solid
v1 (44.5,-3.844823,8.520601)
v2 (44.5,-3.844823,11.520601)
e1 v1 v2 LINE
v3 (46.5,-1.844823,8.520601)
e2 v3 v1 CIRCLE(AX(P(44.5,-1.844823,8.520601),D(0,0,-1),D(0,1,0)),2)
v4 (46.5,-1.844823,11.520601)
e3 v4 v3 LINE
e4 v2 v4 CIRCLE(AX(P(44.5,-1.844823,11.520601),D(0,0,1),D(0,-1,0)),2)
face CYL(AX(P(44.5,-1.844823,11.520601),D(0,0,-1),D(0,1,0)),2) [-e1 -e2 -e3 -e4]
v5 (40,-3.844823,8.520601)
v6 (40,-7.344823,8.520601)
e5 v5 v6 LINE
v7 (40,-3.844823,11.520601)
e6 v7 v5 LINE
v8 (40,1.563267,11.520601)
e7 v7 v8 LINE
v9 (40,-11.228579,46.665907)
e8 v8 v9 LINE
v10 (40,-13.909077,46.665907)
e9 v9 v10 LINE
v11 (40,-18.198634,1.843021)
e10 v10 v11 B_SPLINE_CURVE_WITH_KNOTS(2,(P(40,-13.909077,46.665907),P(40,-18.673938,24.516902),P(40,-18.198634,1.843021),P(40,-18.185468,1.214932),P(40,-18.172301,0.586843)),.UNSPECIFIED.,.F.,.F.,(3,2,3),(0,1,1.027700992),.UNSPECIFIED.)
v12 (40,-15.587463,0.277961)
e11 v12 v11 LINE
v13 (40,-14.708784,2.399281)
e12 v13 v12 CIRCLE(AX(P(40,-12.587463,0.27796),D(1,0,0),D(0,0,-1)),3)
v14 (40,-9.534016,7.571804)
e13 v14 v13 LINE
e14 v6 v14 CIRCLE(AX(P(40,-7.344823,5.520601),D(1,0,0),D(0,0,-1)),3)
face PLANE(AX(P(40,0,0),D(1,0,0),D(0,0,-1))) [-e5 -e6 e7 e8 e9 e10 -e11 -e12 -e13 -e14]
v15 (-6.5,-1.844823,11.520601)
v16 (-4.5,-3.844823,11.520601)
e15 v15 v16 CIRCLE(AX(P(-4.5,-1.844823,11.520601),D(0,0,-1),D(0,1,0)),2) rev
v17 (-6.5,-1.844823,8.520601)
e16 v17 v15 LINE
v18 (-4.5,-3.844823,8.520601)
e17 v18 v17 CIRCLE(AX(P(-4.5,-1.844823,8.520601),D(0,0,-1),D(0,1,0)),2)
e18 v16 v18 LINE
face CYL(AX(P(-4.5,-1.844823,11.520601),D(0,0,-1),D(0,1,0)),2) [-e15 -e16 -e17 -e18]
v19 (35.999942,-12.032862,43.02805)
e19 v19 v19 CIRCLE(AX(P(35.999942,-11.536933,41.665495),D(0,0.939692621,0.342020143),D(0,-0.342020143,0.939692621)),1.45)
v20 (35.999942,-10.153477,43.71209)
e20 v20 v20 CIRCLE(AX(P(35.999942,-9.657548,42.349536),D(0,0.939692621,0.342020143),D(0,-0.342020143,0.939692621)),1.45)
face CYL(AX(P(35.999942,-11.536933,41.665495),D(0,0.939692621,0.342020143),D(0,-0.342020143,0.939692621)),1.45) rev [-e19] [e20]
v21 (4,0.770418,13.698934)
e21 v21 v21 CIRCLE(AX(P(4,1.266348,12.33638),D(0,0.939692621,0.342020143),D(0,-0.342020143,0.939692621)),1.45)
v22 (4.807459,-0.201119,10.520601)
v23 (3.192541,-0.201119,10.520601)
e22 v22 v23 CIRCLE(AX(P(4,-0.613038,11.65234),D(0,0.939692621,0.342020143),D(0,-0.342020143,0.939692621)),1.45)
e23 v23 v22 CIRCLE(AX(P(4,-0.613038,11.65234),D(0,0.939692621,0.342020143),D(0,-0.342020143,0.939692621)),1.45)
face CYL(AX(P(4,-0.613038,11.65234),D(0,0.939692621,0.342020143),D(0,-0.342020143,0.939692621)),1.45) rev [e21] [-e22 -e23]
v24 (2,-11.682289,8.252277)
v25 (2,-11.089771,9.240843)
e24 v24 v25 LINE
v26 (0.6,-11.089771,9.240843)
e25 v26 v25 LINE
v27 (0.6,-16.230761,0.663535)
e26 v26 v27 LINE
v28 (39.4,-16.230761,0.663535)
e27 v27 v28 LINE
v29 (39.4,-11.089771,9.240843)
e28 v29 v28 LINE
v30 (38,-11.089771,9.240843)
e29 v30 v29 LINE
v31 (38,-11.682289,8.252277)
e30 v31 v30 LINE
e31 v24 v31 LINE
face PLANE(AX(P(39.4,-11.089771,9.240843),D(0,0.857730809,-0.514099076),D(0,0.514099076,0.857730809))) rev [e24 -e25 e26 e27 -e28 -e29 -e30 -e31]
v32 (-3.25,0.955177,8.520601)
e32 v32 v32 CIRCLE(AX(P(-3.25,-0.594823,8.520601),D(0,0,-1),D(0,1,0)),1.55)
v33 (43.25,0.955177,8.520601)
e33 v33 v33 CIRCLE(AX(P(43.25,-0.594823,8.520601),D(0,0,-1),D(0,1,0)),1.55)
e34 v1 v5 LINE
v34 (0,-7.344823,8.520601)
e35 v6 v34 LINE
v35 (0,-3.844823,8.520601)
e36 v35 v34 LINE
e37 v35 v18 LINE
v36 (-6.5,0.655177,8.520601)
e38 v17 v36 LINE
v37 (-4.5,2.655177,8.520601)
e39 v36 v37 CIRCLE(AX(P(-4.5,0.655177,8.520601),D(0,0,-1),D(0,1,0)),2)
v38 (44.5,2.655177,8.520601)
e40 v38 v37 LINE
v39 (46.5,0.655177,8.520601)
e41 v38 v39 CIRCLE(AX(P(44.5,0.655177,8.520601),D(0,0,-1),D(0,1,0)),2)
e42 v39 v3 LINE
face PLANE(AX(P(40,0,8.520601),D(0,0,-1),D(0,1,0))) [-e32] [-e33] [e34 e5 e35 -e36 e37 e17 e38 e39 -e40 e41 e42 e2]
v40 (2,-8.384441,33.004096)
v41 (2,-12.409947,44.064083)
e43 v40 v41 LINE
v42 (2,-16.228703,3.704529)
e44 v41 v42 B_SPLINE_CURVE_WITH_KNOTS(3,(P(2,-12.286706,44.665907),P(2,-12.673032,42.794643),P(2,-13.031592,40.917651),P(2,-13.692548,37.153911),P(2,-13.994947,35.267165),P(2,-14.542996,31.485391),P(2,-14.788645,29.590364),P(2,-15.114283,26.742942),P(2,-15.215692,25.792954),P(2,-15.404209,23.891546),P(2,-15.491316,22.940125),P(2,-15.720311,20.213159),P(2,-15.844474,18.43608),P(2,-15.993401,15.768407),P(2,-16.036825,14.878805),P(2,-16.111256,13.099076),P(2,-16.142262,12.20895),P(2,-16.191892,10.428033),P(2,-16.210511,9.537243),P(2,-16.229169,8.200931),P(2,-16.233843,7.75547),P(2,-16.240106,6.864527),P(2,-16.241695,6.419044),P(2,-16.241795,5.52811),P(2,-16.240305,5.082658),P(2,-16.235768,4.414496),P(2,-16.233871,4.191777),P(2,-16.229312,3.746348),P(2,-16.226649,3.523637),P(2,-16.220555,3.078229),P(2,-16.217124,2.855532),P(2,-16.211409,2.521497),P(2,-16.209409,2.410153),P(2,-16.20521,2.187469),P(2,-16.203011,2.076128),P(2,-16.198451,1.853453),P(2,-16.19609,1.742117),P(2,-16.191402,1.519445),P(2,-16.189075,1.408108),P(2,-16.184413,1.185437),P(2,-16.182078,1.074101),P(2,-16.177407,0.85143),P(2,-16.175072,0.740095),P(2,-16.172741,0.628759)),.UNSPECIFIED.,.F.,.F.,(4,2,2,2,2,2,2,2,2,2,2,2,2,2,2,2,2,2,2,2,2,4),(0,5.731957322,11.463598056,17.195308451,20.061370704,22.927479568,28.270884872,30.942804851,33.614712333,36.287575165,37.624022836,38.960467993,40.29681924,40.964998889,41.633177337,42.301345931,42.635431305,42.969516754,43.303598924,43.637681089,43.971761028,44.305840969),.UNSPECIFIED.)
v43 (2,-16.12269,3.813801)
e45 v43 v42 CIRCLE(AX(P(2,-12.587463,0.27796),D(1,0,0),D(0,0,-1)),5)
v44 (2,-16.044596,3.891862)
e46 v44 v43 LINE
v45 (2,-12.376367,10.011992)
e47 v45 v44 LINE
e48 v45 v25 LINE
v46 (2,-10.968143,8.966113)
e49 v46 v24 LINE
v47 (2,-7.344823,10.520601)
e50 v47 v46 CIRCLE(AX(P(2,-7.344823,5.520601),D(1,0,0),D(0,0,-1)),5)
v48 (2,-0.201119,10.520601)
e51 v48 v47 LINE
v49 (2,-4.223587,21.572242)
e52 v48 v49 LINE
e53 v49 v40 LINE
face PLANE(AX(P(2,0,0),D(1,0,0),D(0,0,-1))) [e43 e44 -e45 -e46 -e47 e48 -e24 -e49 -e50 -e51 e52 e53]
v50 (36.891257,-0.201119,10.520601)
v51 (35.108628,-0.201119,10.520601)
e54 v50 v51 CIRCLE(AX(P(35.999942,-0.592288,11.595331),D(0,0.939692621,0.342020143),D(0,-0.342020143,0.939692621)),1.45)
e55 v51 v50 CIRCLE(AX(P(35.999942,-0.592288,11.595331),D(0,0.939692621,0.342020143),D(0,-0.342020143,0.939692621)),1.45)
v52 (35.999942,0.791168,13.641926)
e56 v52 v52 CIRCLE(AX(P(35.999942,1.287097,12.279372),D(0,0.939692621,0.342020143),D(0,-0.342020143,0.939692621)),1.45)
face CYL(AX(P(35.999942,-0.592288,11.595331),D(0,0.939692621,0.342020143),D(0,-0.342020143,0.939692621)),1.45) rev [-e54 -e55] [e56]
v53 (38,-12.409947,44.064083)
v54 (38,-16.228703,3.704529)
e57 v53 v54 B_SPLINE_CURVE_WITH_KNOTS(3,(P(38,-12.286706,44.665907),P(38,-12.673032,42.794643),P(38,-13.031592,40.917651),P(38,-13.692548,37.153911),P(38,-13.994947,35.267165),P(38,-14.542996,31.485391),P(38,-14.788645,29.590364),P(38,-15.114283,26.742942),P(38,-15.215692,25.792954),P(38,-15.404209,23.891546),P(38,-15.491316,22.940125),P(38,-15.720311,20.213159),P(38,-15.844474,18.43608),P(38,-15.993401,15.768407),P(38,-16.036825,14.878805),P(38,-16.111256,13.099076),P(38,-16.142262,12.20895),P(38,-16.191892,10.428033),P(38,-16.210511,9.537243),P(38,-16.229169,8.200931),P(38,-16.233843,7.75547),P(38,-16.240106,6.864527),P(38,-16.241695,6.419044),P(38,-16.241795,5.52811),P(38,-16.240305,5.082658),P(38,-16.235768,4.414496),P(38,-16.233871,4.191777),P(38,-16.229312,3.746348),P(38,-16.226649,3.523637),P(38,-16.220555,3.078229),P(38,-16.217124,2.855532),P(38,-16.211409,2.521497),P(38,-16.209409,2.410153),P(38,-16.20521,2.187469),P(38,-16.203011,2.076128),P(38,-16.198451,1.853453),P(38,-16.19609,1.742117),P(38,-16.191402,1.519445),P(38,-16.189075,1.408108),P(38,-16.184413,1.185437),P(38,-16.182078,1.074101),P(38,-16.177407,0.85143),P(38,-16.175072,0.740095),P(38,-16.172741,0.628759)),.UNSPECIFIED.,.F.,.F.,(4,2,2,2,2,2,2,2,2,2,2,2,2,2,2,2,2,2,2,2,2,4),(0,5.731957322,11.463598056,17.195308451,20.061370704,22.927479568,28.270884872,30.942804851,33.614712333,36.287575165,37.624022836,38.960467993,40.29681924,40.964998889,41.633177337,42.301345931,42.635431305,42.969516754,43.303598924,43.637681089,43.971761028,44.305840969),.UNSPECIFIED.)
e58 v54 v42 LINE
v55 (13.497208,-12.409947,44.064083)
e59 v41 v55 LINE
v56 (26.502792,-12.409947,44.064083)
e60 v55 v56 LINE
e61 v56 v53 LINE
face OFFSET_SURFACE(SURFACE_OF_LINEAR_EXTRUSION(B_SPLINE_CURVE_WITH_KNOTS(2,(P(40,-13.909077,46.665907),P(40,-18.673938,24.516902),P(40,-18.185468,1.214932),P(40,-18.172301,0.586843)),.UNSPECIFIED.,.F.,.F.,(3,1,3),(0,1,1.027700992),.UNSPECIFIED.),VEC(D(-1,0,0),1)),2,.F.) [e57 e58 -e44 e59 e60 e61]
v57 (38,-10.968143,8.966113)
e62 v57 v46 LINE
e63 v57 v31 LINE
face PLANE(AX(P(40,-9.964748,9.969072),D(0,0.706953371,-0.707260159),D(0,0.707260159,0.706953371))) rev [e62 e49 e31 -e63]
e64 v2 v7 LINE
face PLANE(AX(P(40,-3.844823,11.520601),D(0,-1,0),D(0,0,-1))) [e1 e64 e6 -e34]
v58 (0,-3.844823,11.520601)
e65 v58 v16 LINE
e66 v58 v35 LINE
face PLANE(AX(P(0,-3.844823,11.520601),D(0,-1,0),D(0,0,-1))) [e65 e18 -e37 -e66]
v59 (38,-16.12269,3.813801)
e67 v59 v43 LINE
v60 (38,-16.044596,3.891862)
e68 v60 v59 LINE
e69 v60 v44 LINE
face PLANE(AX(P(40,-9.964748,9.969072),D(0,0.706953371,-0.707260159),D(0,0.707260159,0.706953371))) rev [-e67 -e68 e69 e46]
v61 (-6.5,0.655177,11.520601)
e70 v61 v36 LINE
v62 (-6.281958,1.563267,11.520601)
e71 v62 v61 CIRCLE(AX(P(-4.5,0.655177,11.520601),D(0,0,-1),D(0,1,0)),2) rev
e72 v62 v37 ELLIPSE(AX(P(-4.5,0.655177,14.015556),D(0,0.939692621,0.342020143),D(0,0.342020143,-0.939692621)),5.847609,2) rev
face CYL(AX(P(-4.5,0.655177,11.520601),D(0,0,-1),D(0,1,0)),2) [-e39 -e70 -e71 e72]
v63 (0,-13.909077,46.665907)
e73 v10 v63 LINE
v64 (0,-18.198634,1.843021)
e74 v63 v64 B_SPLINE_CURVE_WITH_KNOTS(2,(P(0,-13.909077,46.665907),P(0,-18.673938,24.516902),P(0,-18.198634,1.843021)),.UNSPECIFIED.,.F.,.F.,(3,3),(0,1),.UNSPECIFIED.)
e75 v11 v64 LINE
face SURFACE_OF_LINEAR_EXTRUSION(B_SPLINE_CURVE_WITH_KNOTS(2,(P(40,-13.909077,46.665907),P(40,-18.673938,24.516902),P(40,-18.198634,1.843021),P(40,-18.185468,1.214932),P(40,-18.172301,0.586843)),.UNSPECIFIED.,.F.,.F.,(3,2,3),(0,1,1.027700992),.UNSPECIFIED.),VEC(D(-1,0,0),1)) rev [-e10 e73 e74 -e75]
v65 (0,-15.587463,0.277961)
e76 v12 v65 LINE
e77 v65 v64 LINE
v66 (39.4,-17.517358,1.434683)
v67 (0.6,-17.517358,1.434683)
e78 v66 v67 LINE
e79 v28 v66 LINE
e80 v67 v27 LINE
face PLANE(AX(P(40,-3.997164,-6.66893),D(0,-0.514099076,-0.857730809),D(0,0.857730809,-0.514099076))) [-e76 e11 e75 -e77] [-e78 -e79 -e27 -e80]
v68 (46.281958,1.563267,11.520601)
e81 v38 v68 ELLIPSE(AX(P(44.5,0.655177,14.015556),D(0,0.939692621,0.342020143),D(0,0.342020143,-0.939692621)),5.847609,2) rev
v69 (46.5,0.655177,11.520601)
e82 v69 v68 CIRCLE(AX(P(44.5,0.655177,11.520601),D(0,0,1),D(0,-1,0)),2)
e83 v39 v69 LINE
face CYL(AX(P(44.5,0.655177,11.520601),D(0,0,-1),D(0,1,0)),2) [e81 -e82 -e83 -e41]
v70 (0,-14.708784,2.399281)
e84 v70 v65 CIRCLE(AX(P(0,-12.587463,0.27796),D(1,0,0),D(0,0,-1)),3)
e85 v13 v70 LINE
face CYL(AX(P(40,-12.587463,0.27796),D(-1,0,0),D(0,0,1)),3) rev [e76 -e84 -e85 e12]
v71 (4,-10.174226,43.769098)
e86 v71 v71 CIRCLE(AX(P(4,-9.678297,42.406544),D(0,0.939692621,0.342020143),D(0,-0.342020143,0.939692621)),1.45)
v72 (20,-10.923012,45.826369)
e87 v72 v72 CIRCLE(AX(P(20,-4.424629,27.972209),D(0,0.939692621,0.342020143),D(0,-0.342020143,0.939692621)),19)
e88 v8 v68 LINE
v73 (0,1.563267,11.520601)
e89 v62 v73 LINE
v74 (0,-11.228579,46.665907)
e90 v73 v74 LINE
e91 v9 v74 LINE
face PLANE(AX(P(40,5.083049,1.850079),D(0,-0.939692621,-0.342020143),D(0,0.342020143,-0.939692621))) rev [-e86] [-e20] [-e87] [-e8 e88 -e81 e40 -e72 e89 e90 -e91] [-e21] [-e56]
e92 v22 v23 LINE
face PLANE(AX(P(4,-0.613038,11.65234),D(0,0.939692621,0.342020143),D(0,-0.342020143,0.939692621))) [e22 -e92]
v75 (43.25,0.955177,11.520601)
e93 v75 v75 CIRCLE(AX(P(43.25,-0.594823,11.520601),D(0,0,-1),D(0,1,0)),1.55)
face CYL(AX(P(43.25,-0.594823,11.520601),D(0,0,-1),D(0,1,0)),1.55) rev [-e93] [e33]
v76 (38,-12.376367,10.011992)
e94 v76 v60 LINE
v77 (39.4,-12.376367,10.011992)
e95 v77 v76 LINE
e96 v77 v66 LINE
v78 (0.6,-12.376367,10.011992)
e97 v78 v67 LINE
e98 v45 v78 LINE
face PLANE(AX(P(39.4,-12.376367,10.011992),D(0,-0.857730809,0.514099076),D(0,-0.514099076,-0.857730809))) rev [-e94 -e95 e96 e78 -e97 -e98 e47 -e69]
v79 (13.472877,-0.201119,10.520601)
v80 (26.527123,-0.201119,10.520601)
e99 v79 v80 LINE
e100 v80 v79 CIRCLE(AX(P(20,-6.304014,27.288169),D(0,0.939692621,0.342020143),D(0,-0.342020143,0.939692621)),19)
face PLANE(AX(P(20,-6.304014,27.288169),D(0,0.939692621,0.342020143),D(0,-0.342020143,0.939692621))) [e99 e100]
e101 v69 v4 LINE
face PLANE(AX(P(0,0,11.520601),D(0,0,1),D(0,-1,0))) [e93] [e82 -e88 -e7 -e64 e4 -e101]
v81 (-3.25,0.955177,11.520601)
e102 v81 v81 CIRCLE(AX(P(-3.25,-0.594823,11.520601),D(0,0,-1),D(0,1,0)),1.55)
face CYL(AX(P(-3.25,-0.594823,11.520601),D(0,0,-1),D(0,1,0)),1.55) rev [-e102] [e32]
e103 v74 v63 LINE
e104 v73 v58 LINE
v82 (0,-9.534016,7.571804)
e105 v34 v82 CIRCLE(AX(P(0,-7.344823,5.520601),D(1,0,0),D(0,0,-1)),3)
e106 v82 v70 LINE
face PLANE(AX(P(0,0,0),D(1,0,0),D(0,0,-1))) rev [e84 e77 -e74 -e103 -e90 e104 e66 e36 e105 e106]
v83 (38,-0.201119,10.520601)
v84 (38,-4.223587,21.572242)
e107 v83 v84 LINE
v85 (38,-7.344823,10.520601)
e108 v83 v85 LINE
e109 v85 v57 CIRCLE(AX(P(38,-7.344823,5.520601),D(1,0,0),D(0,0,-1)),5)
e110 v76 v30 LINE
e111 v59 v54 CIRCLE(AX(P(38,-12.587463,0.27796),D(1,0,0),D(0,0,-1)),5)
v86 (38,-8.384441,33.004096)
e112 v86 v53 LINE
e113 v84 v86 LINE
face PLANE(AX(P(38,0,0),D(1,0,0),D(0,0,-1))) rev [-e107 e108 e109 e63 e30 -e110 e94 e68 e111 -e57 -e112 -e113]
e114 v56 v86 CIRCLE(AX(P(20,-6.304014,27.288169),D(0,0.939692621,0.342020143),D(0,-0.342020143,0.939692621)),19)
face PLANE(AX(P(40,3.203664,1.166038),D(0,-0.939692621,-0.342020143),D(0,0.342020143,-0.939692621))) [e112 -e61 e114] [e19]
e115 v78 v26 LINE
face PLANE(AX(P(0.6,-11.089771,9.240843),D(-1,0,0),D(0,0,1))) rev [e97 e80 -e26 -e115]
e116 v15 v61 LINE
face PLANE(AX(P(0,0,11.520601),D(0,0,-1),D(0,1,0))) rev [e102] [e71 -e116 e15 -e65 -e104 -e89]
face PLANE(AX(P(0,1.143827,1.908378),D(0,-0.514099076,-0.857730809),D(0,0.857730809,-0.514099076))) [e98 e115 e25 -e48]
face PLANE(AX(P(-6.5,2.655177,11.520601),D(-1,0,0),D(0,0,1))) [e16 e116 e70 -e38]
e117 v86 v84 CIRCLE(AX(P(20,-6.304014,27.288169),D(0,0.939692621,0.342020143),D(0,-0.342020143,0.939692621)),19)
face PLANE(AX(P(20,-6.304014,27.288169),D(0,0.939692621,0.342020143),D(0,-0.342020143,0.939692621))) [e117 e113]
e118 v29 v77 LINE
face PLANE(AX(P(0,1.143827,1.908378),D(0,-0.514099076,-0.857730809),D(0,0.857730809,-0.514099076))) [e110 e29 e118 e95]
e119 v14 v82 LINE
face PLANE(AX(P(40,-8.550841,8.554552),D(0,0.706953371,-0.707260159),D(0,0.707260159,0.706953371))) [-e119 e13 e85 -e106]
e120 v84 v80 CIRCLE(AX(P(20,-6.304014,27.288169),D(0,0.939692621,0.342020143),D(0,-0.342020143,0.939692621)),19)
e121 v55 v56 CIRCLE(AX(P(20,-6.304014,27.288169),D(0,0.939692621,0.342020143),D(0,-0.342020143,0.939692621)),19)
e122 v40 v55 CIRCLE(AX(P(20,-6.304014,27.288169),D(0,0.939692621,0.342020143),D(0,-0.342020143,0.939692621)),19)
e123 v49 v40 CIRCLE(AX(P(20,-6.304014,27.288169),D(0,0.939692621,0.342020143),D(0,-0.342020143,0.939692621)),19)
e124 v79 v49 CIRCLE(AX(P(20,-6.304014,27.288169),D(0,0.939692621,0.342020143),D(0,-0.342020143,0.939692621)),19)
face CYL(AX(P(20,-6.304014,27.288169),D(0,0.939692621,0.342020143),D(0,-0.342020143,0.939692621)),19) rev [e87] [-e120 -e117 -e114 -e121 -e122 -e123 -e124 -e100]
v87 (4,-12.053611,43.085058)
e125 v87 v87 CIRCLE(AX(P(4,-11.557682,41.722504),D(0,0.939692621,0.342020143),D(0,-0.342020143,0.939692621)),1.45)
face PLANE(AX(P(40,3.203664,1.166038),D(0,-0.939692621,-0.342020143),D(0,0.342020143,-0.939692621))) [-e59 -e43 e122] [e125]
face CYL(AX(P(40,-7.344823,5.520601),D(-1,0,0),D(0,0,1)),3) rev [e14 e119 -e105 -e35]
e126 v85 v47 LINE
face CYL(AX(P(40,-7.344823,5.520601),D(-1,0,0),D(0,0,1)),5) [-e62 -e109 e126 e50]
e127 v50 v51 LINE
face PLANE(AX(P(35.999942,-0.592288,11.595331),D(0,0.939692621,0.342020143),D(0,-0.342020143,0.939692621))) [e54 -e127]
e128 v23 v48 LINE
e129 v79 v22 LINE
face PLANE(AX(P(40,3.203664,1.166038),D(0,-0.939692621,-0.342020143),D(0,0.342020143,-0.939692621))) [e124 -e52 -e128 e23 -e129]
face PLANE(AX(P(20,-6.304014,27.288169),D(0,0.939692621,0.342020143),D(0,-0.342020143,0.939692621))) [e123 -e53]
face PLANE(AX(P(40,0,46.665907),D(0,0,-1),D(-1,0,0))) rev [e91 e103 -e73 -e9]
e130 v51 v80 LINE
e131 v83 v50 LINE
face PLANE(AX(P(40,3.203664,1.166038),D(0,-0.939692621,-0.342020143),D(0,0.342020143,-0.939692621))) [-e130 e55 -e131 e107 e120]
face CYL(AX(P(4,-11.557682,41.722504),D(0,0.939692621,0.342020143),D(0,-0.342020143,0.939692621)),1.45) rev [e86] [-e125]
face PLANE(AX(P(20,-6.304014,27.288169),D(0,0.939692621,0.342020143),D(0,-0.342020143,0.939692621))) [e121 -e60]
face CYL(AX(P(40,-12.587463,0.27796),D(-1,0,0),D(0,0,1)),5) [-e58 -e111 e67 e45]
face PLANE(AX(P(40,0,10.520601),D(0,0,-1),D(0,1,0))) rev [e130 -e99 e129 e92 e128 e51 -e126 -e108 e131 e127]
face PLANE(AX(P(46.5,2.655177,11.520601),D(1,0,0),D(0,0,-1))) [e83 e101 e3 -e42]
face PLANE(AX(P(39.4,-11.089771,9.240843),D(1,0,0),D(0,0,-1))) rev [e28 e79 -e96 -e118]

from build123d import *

# Parameters (mm, degrees)
Y_KSEKLIK_EKSTR_ZYON1_DEPTH = 40
BO_ALTMA1_START             = 2
BO_ALTMA1_DEPTH             = 36
IZIM4_W                     = 38.8
IZIM4_H                     = 1.5
KES_EKSTR_ZYON1_DEPTH       = 10
IZIM5_R                     = 1.45
IZIM5_R_2                   = 19
KES_EKSTR_ZYON2_DEPTH       = 2
IZIM6_W                     = 6.5
IZIM6_H                     = 6.5
IZIM6_R                     = 1.55
Y_KSEKLIK_EKSTR_ZYON2_DEPTH = 3
RADYUS1_R                   = 2
KES_EKSTR_ZYON3_DEPTH       = 10
KES_EKSTR_ZYON3_DEPTH_BACK  = 55


# Read off the part's stored shape, not the designer's step: İç Boşaltma1
with BuildPart() as part:
    # Çizim2 → Yükseklik-Ekstrüzyon1 (new body)
    with BuildSketch(Plane(origin=(0, 0, 0), x_dir=(0, 0, -1), z_dir=(1, 0, 0))):
        with BuildLine():
            Line((-8.520601237, 2.655177464), (-8.520601237, -7.344822536))
            ThreePointArc((-8.520601237, -7.344822536), (-8.2732007, -8.537800405), (-7.571803773, -9.53401603))
            Line((-7.571803773, -9.53401603), (-2.399280893, -14.708783566))
            ThreePointArc((-2.399280893, -14.708783566), (-1.426311448, -15.35897725), (-0.27796055, -15.587463223))
            Line((-0.27796055, -15.587463223), (-1.843021011, -18.19863418))
            add(Edge.make_bspline(
                [(-46.665907249, -13.909076506), (-24.516902354, -18.673937552), (-1.843021011, -18.19863418)],
                knots=[0, 0, 0, 1, 1, 1], degree=2))
            Line((-46.665907249, -13.909076506), (-46.665907249, -11.228578501))
            Line((-46.665907249, -11.228578501), (-8.520601237, 2.655177464))
        make_face()
    extrude(amount=Y_KSEKLIK_EKSTR_ZYON1_DEPTH)

    # İç Boşaltma1 outline → İç Boşaltma1 (cut)
    with BuildSketch(Plane.YZ.offset(BO_ALTMA1_START)):
        with BuildLine():
            Line((-0.201118549, 10.520601237), (-12.409947295, 44.064082645))
            add(Edge.make_bspline(
                [(-12.409947295, 44.064082645), (-12.786167702, 42.211926114), (-13.142061282, 40.357797151), (-13.477631026, 38.501688751), (-13.792879631, 36.643593797), (-14.087809503, 34.783505061), (-14.362422751, 32.921415207), (-14.616721192, 31.057316786), (-14.850706351, 29.19120224), (-15.064379456, 27.323063899), (-15.257741445, 25.452893983), (-15.526587368, 22.544304232), (-15.616158228, 21.507298941), (-15.699505521, 20.469667421), (-15.77662923, 19.431408364), (-15.847529338, 18.39252046), (-15.912205827, 17.353002403), (-15.970658681, 16.312852883), (-16.02288788, 15.272070593), (-16.06889341, 14.230654225), (-16.108675251, 13.18860247), (-16.159012454, 11.624569796), (-16.174235562, 11.103066399), (-16.187902686, 10.581403672), (-16.200013803, 10.059581454), (-16.210568888, 9.537599587), (-16.219567918, 9.01545791), (-16.227010868, 8.493156266), (-16.232897715, 7.970694494), (-16.237228434, 7.448072435), (-16.240003003, 6.92528993), (-16.241792402, 6.157267265), (-16.242021612, 5.912152435), (-16.241909023, 5.667002314), (-16.241454632, 5.421816888), (-16.240658436, 5.176596139), (-16.23952043, 4.931340051), (-16.238040611, 4.68604861), (-16.236218976, 4.440721798), (-16.234055521, 4.1953596), (-16.231550242, 3.949961999), (-16.228703137, 3.704528981)],
                knots=[0.04971795, 0.04971795, 0.04971795, 0.04971795, 0.04971795, 0.04971795, 0.04971795, 0.04971795, 0.04971795, 0.04971795, 0.04971795, 0.04971795, 0.513850496, 0.513850496, 0.513850496, 0.513850496, 0.513850496, 0.513850496, 0.513850496, 0.513850496, 0.513850496, 0.513850496, 0.770775744, 0.770775744, 0.770775744, 0.770775744, 0.770775744, 0.770775744, 0.770775744, 0.770775744, 0.770775744, 0.770775744, 0.899238368, 0.899238368, 0.899238368, 0.899238368, 0.899238368, 0.899238368, 0.899238368, 0.899238368, 0.899238368, 0.899238368, 0.959442934, 0.959442934, 0.959442934, 0.959442934, 0.959442934, 0.959442934, 0.959442934, 0.959442934, 0.959442934, 0.959442934, 0.959442934, 0.959442934], degree=11))
            ThreePointArc((-16.228703137, 3.704528981), (-16.17611264, 3.759568607), (-16.122690278, 3.81380118))
            Line((-16.122690278, 3.81380118), (-10.968143105, 8.966112527))
            ThreePointArc((-10.968143105, 8.966112527), (-9.316172777, 10.115574384), (-7.344822536, 10.520601237))
            Line((-7.344822536, 10.520601237), (-0.201118549, 10.520601237))
        make_face()
    extrude(amount=BO_ALTMA1_DEPTH, mode=Mode.SUBTRACT)

    # Çizim4 → Kes-Ekstrüzyon1 (cut)
    with BuildSketch(Plane(origin=(0, -3.997164066, -6.668930038), x_dir=(-1, 0, 0), z_dir=(0, -0.5140990756107078, -0.8577308088533464))):
        with Locations((-20, -15.0127467)):
            Rectangle(IZIM4_W, IZIM4_H)
    extrude(amount=-KES_EKSTR_ZYON1_DEPTH, mode=Mode.SUBTRACT)

    # Çizim5 → Kes-Ekstrüzyon2 (cut)
    with BuildSketch(Plane(origin=(0, 5.083049154, 1.850078591), x_dir=(1, 0, 0), z_dir=(0, 0.9396926207859106, 0.34202014332566266))):
        with Locations(Location((4, -11.159288927, 0), (0, 0, 270))):
            Circle(IZIM5_R)
        with Locations(Location((35.999942492, -11.09862193, 0), (0, 0, 270))):
            Circle(IZIM5_R)
        with Locations(Location((4, -43.159288927, 0), (0, 0, 270))):
            Circle(IZIM5_R)
        with Locations(Location((35.999942492, -43.09862193, 0), (0, 0, 270))):
            Circle(IZIM5_R)
        with Locations(Location((20, -27.798590964, 0), (0, 0, 270))):
            Circle(IZIM5_R_2)
    extrude(amount=-KES_EKSTR_ZYON2_DEPTH, mode=Mode.SUBTRACT)

    # Çizim6 → Yükseklik-Ekstrüzyon2 (add)
    # profile 1 of 2: a face of its own
    with BuildSketch(Plane(origin=(0, 0, 8.520601237), x_dir=(-1, 0, 0), z_dir=(0, 0, -1))):
        with Locations((-43.25, -0.594822536)):
            Rectangle(IZIM6_W, IZIM6_H)
        with Locations(Location((-43.25, -0.594822536, 0), (0, 0, 90))):
            Circle(IZIM6_R, mode=Mode.SUBTRACT)
    # profile 2 of 2: a face of its own
    with BuildSketch(Plane(origin=(0, 0, 8.520601237), x_dir=(-1, 0, 0), z_dir=(0, 0, -1))):
        with Locations((3.25, -0.594822536)):
            Rectangle(IZIM6_W, IZIM6_H)
        with Locations(Location((3.25, -0.594822536, 0), (0, 0, 90))):
            Circle(IZIM6_R, mode=Mode.SUBTRACT)
    extrude(amount=-Y_KSEKLIK_EKSTR_ZYON2_DEPTH)

    # Radyus1
    radyus1_edges = [part.edges().sort_by_distance(p)[0] for p in [
        (-6.5, -3.844822536, 10.020601237),
        (-6.5, 2.655177464, 10.020601237),
        (46.5, -3.844822536, 10.020601237),
        (46.5, 2.655177464, 10.020601237),
    ]]
    fillet(radyus1_edges, radius=RADYUS1_R)

    # Çizim7 → Kes-Ekstrüzyon3 (cut, two sides: drawn at the far end of the back side and taken through both)
    with BuildSketch(Plane.ZY.offset(-KES_EKSTR_ZYON3_DEPTH_BACK)):
        Polygon((11.520601237, 1.563266761), (8.520601237, 2.655177464), (11.520601237, 2.655177464), align=None)
    extrude(amount=KES_EKSTR_ZYON3_DEPTH + KES_EKSTR_ZYON3_DEPTH_BACK, mode=Mode.SUBTRACT)


solid = part.part
